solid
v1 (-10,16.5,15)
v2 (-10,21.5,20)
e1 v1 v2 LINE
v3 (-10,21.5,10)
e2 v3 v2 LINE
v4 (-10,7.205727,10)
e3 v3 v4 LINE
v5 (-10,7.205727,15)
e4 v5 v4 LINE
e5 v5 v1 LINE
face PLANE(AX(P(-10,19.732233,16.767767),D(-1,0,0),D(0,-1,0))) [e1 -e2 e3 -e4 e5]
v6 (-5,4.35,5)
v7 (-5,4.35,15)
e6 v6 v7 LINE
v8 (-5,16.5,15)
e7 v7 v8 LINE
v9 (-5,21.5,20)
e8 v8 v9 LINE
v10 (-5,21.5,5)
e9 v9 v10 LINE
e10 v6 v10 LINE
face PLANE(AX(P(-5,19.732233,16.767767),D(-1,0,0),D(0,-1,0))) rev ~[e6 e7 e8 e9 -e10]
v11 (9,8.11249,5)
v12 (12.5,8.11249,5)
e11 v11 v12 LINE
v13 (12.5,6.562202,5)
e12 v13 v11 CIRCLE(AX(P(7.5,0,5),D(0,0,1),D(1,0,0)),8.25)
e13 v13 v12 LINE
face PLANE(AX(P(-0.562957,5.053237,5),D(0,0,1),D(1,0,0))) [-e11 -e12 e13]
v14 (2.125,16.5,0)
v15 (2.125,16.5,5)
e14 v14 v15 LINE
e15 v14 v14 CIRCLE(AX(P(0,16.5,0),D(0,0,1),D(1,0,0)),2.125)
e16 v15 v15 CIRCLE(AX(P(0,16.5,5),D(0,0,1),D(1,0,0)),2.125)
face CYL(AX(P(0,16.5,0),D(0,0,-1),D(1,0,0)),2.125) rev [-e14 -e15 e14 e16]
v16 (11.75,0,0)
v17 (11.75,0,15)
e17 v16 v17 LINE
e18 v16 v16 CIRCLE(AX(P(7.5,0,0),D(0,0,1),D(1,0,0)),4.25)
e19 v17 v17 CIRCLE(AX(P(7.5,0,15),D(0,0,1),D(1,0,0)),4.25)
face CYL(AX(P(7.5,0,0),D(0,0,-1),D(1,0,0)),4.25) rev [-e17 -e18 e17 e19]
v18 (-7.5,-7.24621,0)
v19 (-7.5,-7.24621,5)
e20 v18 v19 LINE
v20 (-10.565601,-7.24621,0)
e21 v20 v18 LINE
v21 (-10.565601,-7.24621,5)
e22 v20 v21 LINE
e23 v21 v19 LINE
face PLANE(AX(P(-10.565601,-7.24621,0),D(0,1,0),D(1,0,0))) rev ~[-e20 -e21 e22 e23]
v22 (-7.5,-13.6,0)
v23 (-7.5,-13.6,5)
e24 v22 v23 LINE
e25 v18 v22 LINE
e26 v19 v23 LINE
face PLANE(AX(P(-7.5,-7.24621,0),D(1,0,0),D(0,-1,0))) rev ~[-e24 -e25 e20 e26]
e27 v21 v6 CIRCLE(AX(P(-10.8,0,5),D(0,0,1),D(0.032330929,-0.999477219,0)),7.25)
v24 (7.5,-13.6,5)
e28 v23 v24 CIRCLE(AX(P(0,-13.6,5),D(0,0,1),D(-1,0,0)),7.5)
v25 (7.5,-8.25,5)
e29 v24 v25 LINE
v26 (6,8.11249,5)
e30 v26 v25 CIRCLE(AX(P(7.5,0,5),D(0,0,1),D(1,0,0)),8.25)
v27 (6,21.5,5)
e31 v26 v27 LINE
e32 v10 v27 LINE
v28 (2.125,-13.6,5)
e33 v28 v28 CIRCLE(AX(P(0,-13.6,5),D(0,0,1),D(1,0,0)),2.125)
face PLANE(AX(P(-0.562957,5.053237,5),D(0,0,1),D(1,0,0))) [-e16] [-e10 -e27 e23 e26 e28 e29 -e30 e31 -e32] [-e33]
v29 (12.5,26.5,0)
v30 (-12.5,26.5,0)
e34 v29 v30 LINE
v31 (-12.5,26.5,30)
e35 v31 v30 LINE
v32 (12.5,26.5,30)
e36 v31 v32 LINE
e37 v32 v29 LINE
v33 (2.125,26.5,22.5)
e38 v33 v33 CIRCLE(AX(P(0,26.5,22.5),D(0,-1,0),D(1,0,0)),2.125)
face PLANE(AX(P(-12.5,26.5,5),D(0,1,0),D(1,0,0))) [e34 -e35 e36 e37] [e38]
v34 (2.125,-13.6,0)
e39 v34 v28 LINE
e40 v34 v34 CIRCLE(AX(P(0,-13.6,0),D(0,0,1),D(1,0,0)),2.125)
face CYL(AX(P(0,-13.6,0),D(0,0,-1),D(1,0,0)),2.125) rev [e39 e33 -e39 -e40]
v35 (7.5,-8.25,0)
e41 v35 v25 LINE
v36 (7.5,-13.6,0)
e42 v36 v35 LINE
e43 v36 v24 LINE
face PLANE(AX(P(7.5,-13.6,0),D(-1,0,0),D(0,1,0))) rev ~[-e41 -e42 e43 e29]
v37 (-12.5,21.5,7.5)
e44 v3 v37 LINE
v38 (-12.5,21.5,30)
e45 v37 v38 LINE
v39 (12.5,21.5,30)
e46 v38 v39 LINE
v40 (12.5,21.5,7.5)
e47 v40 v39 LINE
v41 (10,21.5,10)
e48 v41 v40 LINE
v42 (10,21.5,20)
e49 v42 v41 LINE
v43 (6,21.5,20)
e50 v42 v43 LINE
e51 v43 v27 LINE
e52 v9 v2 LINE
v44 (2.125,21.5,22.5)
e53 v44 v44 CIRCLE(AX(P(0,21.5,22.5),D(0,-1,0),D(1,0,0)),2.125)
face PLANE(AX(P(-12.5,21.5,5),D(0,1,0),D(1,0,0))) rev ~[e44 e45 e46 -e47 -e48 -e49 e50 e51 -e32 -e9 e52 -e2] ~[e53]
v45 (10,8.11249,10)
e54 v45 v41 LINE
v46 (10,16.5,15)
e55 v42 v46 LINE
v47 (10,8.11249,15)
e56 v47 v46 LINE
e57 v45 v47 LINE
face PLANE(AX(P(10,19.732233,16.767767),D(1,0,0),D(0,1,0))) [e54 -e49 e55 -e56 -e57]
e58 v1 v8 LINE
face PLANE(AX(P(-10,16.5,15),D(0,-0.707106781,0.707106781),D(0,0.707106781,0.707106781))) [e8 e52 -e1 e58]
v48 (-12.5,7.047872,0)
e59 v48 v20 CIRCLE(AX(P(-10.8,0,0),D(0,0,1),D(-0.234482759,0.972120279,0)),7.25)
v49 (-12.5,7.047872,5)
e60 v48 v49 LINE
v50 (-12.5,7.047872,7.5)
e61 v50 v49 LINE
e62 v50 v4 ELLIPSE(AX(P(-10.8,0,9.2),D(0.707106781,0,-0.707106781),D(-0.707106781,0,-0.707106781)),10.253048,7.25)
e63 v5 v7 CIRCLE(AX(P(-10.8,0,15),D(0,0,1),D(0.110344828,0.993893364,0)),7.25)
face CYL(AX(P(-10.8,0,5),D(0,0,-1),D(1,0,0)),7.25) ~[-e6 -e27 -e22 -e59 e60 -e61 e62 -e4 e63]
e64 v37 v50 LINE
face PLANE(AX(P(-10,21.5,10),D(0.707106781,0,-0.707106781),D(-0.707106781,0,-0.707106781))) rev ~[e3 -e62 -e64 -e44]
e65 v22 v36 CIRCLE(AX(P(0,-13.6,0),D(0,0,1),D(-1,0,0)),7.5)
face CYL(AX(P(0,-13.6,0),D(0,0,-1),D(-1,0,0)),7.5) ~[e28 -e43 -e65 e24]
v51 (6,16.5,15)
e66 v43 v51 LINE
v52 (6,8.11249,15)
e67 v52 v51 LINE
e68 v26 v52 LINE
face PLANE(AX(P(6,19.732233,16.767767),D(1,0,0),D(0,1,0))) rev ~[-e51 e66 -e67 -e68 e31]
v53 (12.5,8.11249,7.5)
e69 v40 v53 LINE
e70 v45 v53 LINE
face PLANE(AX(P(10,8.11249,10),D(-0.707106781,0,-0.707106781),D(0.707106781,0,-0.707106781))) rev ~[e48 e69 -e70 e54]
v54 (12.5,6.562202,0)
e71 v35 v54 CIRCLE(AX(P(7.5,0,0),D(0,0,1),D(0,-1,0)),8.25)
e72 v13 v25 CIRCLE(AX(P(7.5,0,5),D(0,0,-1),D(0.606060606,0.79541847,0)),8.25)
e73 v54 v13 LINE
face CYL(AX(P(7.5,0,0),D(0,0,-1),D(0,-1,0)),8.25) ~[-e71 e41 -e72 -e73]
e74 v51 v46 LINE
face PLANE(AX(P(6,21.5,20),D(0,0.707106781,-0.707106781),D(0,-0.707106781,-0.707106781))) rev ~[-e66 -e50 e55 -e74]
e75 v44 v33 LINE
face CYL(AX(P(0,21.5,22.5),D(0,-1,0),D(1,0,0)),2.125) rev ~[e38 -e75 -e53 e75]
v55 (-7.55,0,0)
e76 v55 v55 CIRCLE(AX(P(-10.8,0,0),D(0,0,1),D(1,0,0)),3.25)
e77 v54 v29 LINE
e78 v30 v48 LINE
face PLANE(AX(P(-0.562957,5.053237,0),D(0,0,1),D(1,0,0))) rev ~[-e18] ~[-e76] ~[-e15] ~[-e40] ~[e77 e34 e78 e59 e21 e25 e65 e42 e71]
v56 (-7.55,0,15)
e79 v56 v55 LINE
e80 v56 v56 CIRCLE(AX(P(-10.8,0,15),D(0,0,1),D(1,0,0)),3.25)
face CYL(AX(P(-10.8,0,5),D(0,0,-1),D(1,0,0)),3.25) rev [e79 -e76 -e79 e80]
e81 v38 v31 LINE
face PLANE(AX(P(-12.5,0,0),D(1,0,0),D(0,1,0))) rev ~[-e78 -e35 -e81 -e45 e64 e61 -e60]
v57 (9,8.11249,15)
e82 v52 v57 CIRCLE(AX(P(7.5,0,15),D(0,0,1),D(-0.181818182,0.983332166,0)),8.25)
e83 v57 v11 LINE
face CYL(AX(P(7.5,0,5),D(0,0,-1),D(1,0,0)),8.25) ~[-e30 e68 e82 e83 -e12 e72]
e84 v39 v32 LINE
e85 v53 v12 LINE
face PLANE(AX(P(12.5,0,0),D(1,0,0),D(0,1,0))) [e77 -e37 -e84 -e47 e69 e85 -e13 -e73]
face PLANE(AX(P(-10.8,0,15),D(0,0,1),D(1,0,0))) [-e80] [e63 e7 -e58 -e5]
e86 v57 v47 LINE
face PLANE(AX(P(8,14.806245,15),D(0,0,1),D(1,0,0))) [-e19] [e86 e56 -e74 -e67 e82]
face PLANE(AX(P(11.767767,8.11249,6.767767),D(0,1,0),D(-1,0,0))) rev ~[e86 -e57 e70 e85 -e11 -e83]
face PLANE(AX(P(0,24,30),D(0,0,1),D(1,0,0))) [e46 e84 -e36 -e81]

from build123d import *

# Parameters (mm, degrees)
F0_R          = 3.25
F0_R_2        = 2.125
F0_R_3        = 4.25
F1_DEPTH      = 5
F2_W          = 25
F2_H          = 5
F3_DEPTH      = 25
F4_R          = 7.25
F4_R_2        = 3.25
F4_R_3        = 8.25
F4_R_4        = 4.25
F5_DEPTH      = 10
F6_R          = 2.125
F7_DEPTH      = 5.001
F8_W          = 5
F8_H          = 17.15
F8_W_2        = 4
F8_H_2        = 13.3875096302
F9_DEPTH      = 10
F10_T1_DEPTH  = 5
F10_T3_DEPTH  = 4
F10_T8_DEPTH  = 30.7168298797
F10_T13_DEPTH = 29.7168298797
F10_T18_DEPTH = 27.1526880508
F10_S20_R     = 3.25
F10_T21_DEPTH = 16
F10_T25_DEPTH = 13.3875096302


# Not quite as in the source:
# - a fillet or chamfer that OpenCascade refuses, or shapes differently, is made with other operations: its cross-section is extruded or revolved along the edge and cut away or added


with BuildPart() as f1:
    # F0 (on Top) → F1 (new body)
    with BuildSketch(Plane.XY):
        with BuildLine():
            Line((12.5, 26.5), (0, 26.5))
            Line((0, 26.5), (-12.5, 26.5))
            Line((-12.5, 26.5), (-12.5, 7.0478720193))
            ThreePointArc((-12.5, 7.0478720193), (-17.9845104515, -0.9722703187), (-10.5656007648, -7.2462098368))
            Line((-10.5656007648, -7.2462098368), (-7.5, -7.2462098368))
            Line((-7.5, -7.2462098368), (-7.5, -13.6))
            ThreePointArc((-7.5, -13.6), (-5.3033008589, -18.9033008589), (0, -21.1))
            ThreePointArc((0, -21.1), (5.3033008589, -18.9033008589), (7.5, -13.6))
            Line((7.5, -13.6), (7.5, -8.25))
            ThreePointArc((7.5, -8.25), (15.3166703137, -2.6385915194), (12.5, 6.5622023742))
            Line((12.5, 6.5622023742), (12.5, 26.5))
        make_face()
        with Locations((-10.8, 0)):
            Circle(F0_R, mode=Mode.SUBTRACT)
        with Locations((0, -13.6)):
            Circle(F0_R_2, mode=Mode.SUBTRACT)
        with Locations((7.5, 0)):
            Circle(F0_R_3, mode=Mode.SUBTRACT)
        with Locations((0, 16.5)):
            Circle(F0_R_2, mode=Mode.SUBTRACT)
    extrude(amount=F1_DEPTH)

    # F2 (on face) → F3 (join)
    with BuildSketch(Plane.XY.offset(5)):
        with Locations((0, 24)):
            Rectangle(F2_W, F2_H)
    extrude(amount=F3_DEPTH)

    # F4 (on face) → F5 (join)
    with BuildSketch(Plane.XY.offset(5)):
        with Locations((-10.8, 0)):
            Circle(F4_R)
        with Locations((-10.8, 0)):
            Circle(F4_R_2, mode=Mode.SUBTRACT)
        with Locations((7.5, 0)):
            Circle(F4_R_3)
        with Locations((7.5, 0)):
            Circle(F4_R_4, mode=Mode.SUBTRACT)
    extrude(amount=F5_DEPTH)

    # F6 (on face) → F7 (cut, through all)
    with BuildSketch(Plane.XZ.offset(-21.5)):
        with Locations((0, 22.5)):
            Circle(F6_R)
    extrude(amount=-F7_DEPTH, mode=Mode.SUBTRACT)

    # F8 (on face) → F9 (join)
    with BuildSketch(Plane.XY.offset(5)):
        with Locations((-7.5, 12.925)):
            Rectangle(F8_W, F8_H)
        with Locations((8, 14.8062451849)):
            Rectangle(F8_W_2, F8_H_2)
    extrude(amount=F9_DEPTH)

    # F10: chamfer of 5 on 4 edges, made by hand

    # F10_s2 → F10_t1 (join)
    with BuildSketch(Plane.YZ.offset(-10)):
        Polygon((16.5, 15), (21.5, 20), (21.5, 15), align=None)
    extrude(amount=F10_T1_DEPTH)

    # F10_s4 → F10_t3 (join)
    with BuildSketch(Plane.YZ.offset(6)):
        Polygon((21.5, 20), (16.5, 15), (21.5, 15), align=None)
    extrude(amount=F10_T3_DEPTH)


with BuildPart() as f10_tool6:
    # F10_s7 → F10_t8 (new body)
    with BuildSketch(Plane.YZ.offset(7.8584149398)):
        Polygon((16.5, 15), (21.5, 20), (21.5, 15), align=None)
    extrude(amount=-F10_T8_DEPTH)

    split(bisect_by=Plane.YZ.offset(6), keep=Keep.TOP)


with BuildPart() as f1_1:
    add(f1.part)

    # F10_t5: union F10_tool6
    add(f10_tool6.part)


with BuildPart() as f10_tool11:
    # F10_s12 → F10_t13 (new body)
    with BuildSketch(Plane.YZ.offset(22.8584149398)):
        Polygon((21.5, 20), (16.5, 15), (21.5, 15), align=None)
    extrude(amount=-F10_T13_DEPTH)

    split(bisect_by=Plane.YZ.offset(-5), keep=Keep.BOTTOM)


with BuildPart() as f1_2:
    add(f1_1.part)

    # F10_t10: union F10_tool11
    add(f10_tool11.part)


with BuildPart() as f10_tool16:
    # F10_s17 → F10_t18 (new body)
    with BuildSketch(Plane.XZ.offset(-21.5)):
        Polygon((-10, 10), (-15, 5), (-10, 5), align=None)
    extrude(amount=F10_T18_DEPTH)

    split(bisect_by=Plane.YZ.offset(-12.5), keep=Keep.TOP)

    # F10_s20 → F10_t21 (cut, symmetric)
    with BuildSketch(Plane.XY.offset(7.5)):
        with Locations((-10.8, 0)):
            Circle(F10_S20_R)
    extrude(amount=F10_T21_DEPTH, both=True, mode=Mode.SUBTRACT)


with BuildPart() as f1_3:
    add(f1_2.part)

    # F10_t15: union F10_tool16
    add(f10_tool16.part)


with BuildPart() as f10_tool23:
    # F10_s24 → F10_t25 (new body)
    with BuildSketch(Plane.XZ.offset(-8.1124903698)):
        Polygon((10, 10), (15, 5), (10, 5), align=None)
    extrude(amount=-F10_T25_DEPTH)

    split(bisect_by=Plane.YZ.offset(12.5), keep=Keep.BOTTOM)


with BuildPart() as f1_4:
    add(f1_3.part)

    # F10_t22: union F10_tool23
    add(f10_tool23.part)


solid = f1_4.part
